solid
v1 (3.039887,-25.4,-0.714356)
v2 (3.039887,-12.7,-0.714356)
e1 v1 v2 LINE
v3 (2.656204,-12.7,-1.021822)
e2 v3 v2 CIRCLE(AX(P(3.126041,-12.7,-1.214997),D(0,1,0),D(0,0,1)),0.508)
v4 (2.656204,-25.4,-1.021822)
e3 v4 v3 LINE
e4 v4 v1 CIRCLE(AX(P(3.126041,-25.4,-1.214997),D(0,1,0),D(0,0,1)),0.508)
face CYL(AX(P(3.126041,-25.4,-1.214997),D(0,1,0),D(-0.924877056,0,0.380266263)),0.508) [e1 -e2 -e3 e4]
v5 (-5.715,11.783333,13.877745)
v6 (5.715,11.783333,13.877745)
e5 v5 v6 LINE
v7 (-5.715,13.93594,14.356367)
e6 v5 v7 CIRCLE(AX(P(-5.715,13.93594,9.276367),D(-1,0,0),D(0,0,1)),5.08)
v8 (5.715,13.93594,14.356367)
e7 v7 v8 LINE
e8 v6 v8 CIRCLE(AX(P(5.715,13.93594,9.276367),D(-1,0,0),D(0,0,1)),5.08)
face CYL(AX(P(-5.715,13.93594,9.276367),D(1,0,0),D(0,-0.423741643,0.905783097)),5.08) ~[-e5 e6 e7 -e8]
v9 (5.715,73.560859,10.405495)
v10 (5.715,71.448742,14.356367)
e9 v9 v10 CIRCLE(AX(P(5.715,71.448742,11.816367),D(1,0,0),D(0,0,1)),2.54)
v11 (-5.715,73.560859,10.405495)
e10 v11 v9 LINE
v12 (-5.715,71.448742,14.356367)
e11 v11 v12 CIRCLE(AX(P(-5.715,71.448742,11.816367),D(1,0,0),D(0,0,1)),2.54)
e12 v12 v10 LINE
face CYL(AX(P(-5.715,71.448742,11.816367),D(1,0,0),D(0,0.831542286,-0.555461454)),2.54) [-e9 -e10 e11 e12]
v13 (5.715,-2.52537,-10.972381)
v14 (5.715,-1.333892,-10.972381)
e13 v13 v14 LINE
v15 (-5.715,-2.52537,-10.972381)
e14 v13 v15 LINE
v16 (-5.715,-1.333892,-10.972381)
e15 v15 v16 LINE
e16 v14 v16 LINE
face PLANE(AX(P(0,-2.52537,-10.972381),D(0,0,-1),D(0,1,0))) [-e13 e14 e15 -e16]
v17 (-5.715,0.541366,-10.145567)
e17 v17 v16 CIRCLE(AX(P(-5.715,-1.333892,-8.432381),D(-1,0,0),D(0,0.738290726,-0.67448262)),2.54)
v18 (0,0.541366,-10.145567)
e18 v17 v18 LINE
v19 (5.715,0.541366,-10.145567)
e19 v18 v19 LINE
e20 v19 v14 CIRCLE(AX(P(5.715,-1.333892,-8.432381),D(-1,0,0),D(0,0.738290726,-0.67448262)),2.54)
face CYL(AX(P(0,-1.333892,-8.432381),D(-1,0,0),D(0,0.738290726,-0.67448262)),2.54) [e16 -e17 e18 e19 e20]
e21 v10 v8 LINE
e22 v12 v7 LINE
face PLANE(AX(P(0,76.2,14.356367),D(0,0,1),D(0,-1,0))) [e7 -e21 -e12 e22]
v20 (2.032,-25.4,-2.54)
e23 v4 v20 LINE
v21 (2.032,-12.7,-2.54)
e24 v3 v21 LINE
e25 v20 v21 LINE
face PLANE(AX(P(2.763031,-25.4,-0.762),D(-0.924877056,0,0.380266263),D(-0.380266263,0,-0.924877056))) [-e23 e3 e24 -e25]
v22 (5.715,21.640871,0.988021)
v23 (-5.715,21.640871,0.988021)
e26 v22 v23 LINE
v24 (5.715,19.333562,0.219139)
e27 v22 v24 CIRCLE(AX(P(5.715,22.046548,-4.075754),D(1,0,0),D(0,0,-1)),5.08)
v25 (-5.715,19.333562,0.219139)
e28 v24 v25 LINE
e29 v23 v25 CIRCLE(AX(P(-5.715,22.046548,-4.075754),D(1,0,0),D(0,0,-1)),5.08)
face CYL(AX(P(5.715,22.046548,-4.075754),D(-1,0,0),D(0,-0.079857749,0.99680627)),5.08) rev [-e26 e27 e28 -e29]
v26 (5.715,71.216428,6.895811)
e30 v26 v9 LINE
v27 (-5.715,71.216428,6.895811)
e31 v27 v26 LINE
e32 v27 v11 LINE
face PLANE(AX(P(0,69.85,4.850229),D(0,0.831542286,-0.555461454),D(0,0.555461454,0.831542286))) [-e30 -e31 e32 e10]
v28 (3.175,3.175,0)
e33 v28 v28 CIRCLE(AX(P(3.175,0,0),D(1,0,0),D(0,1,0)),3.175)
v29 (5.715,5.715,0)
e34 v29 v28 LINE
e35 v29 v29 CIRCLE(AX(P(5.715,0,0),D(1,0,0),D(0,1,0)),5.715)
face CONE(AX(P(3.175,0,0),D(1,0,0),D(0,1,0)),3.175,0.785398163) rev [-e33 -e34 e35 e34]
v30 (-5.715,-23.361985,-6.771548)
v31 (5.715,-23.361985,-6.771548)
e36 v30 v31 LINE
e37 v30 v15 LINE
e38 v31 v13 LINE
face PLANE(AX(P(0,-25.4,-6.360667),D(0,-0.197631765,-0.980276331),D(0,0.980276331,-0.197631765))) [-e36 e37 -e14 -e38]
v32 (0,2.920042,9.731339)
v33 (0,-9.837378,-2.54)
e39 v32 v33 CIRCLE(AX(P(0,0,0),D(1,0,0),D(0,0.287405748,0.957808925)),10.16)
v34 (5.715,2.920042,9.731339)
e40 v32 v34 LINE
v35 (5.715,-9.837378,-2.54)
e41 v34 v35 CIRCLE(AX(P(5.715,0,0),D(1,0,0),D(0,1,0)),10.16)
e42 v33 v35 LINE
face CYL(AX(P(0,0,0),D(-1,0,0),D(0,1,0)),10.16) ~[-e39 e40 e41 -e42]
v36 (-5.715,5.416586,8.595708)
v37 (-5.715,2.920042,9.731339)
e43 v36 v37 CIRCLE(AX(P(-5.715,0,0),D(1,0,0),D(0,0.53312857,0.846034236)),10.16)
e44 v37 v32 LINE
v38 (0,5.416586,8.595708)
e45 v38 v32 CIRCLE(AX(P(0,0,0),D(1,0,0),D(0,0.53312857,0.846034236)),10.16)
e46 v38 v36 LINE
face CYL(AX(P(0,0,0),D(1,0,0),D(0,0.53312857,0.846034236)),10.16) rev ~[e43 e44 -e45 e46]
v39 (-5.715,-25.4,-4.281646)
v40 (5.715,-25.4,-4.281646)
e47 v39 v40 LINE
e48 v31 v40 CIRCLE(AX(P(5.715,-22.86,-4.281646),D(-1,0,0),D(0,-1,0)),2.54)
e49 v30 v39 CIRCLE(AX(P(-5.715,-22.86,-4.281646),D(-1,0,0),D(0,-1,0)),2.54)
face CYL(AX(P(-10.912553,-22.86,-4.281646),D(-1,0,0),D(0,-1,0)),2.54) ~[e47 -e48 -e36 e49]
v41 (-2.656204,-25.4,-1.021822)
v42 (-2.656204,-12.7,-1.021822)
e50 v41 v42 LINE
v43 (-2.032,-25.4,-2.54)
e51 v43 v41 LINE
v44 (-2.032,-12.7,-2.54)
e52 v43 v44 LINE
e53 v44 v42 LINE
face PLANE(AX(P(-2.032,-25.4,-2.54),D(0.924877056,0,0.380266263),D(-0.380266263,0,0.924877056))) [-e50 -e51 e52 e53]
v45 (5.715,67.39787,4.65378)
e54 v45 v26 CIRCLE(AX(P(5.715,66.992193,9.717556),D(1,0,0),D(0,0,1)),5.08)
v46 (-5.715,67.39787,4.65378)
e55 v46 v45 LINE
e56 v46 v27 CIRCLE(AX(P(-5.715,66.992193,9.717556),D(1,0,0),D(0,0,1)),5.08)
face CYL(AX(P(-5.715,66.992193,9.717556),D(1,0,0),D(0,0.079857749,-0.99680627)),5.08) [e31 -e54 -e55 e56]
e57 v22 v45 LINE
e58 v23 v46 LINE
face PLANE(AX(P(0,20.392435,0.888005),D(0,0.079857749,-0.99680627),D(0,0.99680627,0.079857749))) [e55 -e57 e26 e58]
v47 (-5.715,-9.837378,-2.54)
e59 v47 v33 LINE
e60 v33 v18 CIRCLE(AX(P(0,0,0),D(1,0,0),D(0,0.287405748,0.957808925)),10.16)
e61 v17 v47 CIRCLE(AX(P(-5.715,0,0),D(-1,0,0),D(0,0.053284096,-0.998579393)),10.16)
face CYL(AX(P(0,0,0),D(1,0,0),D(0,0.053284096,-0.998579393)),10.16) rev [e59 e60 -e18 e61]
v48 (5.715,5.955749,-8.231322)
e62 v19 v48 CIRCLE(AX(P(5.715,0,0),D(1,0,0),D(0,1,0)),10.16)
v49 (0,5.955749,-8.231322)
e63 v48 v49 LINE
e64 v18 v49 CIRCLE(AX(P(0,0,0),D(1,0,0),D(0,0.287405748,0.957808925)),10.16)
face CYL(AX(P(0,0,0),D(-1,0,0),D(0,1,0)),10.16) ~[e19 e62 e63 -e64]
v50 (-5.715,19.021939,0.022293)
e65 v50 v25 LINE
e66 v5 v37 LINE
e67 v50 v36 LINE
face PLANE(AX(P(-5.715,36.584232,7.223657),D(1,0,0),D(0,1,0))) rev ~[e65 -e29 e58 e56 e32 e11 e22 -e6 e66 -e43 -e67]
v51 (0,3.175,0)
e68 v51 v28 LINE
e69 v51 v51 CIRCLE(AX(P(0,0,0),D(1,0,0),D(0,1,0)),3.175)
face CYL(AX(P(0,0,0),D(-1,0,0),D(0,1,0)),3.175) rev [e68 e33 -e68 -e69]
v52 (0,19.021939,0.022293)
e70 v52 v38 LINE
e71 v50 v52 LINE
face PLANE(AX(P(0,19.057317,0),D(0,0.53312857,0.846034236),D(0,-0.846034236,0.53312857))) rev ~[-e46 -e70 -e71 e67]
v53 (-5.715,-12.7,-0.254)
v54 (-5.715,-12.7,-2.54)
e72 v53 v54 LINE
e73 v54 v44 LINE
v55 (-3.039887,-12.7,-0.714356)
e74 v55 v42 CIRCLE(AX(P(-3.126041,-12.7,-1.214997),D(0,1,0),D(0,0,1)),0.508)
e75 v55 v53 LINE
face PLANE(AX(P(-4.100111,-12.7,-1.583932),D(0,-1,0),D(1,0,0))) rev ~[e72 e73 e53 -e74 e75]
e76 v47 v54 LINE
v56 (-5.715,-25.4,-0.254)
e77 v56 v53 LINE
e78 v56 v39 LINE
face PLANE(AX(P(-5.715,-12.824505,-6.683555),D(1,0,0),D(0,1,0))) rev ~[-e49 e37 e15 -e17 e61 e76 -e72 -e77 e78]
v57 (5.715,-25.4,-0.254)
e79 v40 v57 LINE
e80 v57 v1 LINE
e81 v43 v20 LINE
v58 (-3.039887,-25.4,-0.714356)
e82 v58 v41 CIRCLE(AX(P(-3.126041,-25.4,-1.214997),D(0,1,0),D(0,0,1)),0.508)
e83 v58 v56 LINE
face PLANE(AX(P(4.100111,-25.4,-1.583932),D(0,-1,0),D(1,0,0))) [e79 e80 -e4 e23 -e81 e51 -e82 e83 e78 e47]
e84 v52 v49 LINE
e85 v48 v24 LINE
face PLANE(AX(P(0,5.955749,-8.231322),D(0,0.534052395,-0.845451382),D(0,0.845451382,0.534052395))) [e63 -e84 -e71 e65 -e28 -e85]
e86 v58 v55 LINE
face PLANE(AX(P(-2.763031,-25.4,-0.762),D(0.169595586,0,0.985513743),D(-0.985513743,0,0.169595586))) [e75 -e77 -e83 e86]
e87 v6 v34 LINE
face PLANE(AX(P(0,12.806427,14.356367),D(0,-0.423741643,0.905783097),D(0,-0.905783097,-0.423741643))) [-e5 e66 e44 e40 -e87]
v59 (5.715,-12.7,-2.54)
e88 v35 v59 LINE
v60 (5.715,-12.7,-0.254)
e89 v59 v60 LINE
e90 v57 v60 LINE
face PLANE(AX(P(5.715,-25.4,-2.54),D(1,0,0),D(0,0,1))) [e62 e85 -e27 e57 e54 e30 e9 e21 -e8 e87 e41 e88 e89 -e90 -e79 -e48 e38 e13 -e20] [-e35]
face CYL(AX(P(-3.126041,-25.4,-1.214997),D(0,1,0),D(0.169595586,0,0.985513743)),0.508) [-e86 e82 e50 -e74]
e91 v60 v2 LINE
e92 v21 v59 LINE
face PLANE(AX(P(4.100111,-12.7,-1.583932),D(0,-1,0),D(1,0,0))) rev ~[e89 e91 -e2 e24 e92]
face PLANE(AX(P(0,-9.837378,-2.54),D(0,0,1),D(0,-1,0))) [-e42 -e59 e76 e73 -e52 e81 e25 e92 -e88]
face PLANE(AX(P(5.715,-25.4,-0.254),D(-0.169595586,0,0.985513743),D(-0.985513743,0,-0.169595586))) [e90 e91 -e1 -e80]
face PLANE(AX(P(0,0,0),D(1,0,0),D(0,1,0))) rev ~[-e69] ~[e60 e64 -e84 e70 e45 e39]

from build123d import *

# Parameters (mm, degrees)
F2_DEPTH     = 5.715
F3_R         = 5.08
F4_R         = 2.54
F0_R         = 10.16
F0_R_2       = 3.175
F5_DEPTH     = 5.715
F7_DEPTH     = 25.4
F9_DEPTH     = 5.715
F10_T1_DEPTH = 10.4031459942
F10_T3_DEPTH = 10.4031462213
F10_T5_DEPTH = 21.8251062119
F12_DEPTH    = 12.7
F13_R        = 0.508
F14_SIZE     = 2.54


# Not quite as in the source:
# - a fillet or chamfer that OpenCascade refuses, or shapes differently, is made with other operations: its cross-section is extruded or revolved along the edge and cut away or added


with BuildPart() as f2:
    # F1 (on Right) → F2 (new body, symmetric)
    with BuildSketch(Plane.YZ):
        Polygon((20.3924354673, 0.8880047341), (69.85, 4.8502287827), (76.2, 14.35636729), (12.8064267337, 14.35636729), (2.9200423986, 9.7313386741), (8.2383593544, 1.7451149179), (4.8682624474, -6.6303843632), (5.9557488763, -8.2313216024), align=None)
    extrude(amount=F2_DEPTH, both=True)

    # F3
    f3_edges = [f2.edges().sort_by_distance(p)[0] for p in [
        (0, 12.806427, 14.356367),
        (0, 69.85, 4.850229),
        (0, 20.392435, 0.888005),
    ]]
    fillet(f3_edges, radius=F3_R)

    # F4
    f4_edges = [f2.edges().sort_by_distance(p)[0] for p in [
        (0, 76.2, 14.356367),
    ]]
    fillet(f4_edges, radius=F4_R)

    # F0 (on Right) → F5 (join)
    with BuildSketch(Plane.YZ):
        Circle(F0_R)
        Circle(F0_R_2, mode=Mode.SUBTRACT)
    extrude(amount=F5_DEPTH)

    # F6 (on Right) → F7 (cut)
    with BuildSketch(Plane.YZ):
        with BuildLine():
            Line((19.0573167056, 0), (5.4165862694, 8.5957078351))
            ThreePointArc((5.4165862694, 8.5957078351), (-10.1595718617, -0.0932715764), (5.5734885208, -8.4948116935))
            Line((5.5734885208, -8.4948116935), (19.0573167056, 0))
        make_face()
    extrude(amount=-F7_DEPTH, mode=Mode.SUBTRACT)

    # F8 (on Right) → F9 (join, symmetric)
    with BuildSketch(Plane.YZ):
        with BuildLine():
            Line((0.5413664183, -10.9723807834), (0.5413664183, -10.1455666378))
            ThreePointArc((0.5413664183, -10.1455666378), (-6.0054239987, -8.1951499434), (-9.8373776994, -2.54))
            Line((-9.8373776994, -2.54), (-25.4, -2.54))
            Line((-25.4, -2.54), (-25.4, -6.360667292))
            Line((-25.4, -6.360667292), (-2.5253696451, -10.9723807834))
            Line((-2.5253696451, -10.9723807834), (0.5413664183, -10.9723807834))
        make_face()
    extrude(amount=F9_DEPTH, both=True)

    # F10: fillet of radius 2.54 on 2 edges, made by hand

    # F10_s2 → F10_t1 (cut)
    with BuildSketch(Plane.YZ.offset(-10.4031461077)):
        with BuildLine():
            ThreePointArc((0.5413664183, -10.1455666378), (-0.3091706163, -10.7565034211), (-1.3338920247, -10.9723807834))
            Line((-1.3338920247, -10.9723807834), (0.5413664183, -10.9723807834))
            Line((0.5413664183, -10.9723807834), (0.5413664183, -10.1455666378))
        make_face()
    extrude(amount=F10_T1_DEPTH, mode=Mode.SUBTRACT)

    # F10_s4 → F10_t3 (cut)
    with BuildSketch(Plane.YZ.offset(-1.135e-07)):
        with BuildLine():
            ThreePointArc((0.5413664183, -10.1455666378), (-0.3091706163, -10.7565034211), (-1.3338920247, -10.9723807834))
            Line((-1.3338920247, -10.9723807834), (0.5413664183, -10.9723807834))
            Line((0.5413664183, -10.9723807834), (0.5413664183, -10.1455666378))
        make_face()
    extrude(amount=F10_T3_DEPTH, mode=Mode.SUBTRACT)

    # F10_s6 → F10_t5 (cut)
    with BuildSketch(Plane.YZ.offset(-10.912553106)):
        with BuildLine():
            ThreePointArc((-25.4, -4.2816460496), (-24.8255331463, -5.8904591062), (-23.3619846843, -6.7715479306))
            Line((-23.3619846843, -6.7715479306), (-25.4, -6.360667292))
            Line((-25.4, -6.360667292), (-25.4, -4.2816460496))
        make_face()
    extrude(amount=F10_T5_DEPTH, mode=Mode.SUBTRACT)

    # F11 (on face) → F12 (join)
    with BuildSketch(Plane.XZ.offset(25.4)):
        Polygon((2.7630305849, -0.762), (2.032, -2.54), (5.715, -2.54), (5.715, -0.254), align=None)
        Polygon((-5.715, -2.54), (-2.032, -2.54), (-2.7630305849, -0.762), (-5.715, -0.254), align=None)
    extrude(amount=-F12_DEPTH)

    # F13
    f13_edges = [f2.edges().sort_by_distance(p)[0] for p in [
        (-2.763031, -19.05, -0.762),
        (2.763031, -19.05, -0.762),
    ]]
    fillet(f13_edges, radius=F13_R)

    # F14
    f14_edges = [f2.edges().sort_by_distance(p)[0] for p in [
        (5.715, -3.175, 0),
    ]]
    chamfer(f14_edges, length=F14_SIZE)


solid = f2.part
